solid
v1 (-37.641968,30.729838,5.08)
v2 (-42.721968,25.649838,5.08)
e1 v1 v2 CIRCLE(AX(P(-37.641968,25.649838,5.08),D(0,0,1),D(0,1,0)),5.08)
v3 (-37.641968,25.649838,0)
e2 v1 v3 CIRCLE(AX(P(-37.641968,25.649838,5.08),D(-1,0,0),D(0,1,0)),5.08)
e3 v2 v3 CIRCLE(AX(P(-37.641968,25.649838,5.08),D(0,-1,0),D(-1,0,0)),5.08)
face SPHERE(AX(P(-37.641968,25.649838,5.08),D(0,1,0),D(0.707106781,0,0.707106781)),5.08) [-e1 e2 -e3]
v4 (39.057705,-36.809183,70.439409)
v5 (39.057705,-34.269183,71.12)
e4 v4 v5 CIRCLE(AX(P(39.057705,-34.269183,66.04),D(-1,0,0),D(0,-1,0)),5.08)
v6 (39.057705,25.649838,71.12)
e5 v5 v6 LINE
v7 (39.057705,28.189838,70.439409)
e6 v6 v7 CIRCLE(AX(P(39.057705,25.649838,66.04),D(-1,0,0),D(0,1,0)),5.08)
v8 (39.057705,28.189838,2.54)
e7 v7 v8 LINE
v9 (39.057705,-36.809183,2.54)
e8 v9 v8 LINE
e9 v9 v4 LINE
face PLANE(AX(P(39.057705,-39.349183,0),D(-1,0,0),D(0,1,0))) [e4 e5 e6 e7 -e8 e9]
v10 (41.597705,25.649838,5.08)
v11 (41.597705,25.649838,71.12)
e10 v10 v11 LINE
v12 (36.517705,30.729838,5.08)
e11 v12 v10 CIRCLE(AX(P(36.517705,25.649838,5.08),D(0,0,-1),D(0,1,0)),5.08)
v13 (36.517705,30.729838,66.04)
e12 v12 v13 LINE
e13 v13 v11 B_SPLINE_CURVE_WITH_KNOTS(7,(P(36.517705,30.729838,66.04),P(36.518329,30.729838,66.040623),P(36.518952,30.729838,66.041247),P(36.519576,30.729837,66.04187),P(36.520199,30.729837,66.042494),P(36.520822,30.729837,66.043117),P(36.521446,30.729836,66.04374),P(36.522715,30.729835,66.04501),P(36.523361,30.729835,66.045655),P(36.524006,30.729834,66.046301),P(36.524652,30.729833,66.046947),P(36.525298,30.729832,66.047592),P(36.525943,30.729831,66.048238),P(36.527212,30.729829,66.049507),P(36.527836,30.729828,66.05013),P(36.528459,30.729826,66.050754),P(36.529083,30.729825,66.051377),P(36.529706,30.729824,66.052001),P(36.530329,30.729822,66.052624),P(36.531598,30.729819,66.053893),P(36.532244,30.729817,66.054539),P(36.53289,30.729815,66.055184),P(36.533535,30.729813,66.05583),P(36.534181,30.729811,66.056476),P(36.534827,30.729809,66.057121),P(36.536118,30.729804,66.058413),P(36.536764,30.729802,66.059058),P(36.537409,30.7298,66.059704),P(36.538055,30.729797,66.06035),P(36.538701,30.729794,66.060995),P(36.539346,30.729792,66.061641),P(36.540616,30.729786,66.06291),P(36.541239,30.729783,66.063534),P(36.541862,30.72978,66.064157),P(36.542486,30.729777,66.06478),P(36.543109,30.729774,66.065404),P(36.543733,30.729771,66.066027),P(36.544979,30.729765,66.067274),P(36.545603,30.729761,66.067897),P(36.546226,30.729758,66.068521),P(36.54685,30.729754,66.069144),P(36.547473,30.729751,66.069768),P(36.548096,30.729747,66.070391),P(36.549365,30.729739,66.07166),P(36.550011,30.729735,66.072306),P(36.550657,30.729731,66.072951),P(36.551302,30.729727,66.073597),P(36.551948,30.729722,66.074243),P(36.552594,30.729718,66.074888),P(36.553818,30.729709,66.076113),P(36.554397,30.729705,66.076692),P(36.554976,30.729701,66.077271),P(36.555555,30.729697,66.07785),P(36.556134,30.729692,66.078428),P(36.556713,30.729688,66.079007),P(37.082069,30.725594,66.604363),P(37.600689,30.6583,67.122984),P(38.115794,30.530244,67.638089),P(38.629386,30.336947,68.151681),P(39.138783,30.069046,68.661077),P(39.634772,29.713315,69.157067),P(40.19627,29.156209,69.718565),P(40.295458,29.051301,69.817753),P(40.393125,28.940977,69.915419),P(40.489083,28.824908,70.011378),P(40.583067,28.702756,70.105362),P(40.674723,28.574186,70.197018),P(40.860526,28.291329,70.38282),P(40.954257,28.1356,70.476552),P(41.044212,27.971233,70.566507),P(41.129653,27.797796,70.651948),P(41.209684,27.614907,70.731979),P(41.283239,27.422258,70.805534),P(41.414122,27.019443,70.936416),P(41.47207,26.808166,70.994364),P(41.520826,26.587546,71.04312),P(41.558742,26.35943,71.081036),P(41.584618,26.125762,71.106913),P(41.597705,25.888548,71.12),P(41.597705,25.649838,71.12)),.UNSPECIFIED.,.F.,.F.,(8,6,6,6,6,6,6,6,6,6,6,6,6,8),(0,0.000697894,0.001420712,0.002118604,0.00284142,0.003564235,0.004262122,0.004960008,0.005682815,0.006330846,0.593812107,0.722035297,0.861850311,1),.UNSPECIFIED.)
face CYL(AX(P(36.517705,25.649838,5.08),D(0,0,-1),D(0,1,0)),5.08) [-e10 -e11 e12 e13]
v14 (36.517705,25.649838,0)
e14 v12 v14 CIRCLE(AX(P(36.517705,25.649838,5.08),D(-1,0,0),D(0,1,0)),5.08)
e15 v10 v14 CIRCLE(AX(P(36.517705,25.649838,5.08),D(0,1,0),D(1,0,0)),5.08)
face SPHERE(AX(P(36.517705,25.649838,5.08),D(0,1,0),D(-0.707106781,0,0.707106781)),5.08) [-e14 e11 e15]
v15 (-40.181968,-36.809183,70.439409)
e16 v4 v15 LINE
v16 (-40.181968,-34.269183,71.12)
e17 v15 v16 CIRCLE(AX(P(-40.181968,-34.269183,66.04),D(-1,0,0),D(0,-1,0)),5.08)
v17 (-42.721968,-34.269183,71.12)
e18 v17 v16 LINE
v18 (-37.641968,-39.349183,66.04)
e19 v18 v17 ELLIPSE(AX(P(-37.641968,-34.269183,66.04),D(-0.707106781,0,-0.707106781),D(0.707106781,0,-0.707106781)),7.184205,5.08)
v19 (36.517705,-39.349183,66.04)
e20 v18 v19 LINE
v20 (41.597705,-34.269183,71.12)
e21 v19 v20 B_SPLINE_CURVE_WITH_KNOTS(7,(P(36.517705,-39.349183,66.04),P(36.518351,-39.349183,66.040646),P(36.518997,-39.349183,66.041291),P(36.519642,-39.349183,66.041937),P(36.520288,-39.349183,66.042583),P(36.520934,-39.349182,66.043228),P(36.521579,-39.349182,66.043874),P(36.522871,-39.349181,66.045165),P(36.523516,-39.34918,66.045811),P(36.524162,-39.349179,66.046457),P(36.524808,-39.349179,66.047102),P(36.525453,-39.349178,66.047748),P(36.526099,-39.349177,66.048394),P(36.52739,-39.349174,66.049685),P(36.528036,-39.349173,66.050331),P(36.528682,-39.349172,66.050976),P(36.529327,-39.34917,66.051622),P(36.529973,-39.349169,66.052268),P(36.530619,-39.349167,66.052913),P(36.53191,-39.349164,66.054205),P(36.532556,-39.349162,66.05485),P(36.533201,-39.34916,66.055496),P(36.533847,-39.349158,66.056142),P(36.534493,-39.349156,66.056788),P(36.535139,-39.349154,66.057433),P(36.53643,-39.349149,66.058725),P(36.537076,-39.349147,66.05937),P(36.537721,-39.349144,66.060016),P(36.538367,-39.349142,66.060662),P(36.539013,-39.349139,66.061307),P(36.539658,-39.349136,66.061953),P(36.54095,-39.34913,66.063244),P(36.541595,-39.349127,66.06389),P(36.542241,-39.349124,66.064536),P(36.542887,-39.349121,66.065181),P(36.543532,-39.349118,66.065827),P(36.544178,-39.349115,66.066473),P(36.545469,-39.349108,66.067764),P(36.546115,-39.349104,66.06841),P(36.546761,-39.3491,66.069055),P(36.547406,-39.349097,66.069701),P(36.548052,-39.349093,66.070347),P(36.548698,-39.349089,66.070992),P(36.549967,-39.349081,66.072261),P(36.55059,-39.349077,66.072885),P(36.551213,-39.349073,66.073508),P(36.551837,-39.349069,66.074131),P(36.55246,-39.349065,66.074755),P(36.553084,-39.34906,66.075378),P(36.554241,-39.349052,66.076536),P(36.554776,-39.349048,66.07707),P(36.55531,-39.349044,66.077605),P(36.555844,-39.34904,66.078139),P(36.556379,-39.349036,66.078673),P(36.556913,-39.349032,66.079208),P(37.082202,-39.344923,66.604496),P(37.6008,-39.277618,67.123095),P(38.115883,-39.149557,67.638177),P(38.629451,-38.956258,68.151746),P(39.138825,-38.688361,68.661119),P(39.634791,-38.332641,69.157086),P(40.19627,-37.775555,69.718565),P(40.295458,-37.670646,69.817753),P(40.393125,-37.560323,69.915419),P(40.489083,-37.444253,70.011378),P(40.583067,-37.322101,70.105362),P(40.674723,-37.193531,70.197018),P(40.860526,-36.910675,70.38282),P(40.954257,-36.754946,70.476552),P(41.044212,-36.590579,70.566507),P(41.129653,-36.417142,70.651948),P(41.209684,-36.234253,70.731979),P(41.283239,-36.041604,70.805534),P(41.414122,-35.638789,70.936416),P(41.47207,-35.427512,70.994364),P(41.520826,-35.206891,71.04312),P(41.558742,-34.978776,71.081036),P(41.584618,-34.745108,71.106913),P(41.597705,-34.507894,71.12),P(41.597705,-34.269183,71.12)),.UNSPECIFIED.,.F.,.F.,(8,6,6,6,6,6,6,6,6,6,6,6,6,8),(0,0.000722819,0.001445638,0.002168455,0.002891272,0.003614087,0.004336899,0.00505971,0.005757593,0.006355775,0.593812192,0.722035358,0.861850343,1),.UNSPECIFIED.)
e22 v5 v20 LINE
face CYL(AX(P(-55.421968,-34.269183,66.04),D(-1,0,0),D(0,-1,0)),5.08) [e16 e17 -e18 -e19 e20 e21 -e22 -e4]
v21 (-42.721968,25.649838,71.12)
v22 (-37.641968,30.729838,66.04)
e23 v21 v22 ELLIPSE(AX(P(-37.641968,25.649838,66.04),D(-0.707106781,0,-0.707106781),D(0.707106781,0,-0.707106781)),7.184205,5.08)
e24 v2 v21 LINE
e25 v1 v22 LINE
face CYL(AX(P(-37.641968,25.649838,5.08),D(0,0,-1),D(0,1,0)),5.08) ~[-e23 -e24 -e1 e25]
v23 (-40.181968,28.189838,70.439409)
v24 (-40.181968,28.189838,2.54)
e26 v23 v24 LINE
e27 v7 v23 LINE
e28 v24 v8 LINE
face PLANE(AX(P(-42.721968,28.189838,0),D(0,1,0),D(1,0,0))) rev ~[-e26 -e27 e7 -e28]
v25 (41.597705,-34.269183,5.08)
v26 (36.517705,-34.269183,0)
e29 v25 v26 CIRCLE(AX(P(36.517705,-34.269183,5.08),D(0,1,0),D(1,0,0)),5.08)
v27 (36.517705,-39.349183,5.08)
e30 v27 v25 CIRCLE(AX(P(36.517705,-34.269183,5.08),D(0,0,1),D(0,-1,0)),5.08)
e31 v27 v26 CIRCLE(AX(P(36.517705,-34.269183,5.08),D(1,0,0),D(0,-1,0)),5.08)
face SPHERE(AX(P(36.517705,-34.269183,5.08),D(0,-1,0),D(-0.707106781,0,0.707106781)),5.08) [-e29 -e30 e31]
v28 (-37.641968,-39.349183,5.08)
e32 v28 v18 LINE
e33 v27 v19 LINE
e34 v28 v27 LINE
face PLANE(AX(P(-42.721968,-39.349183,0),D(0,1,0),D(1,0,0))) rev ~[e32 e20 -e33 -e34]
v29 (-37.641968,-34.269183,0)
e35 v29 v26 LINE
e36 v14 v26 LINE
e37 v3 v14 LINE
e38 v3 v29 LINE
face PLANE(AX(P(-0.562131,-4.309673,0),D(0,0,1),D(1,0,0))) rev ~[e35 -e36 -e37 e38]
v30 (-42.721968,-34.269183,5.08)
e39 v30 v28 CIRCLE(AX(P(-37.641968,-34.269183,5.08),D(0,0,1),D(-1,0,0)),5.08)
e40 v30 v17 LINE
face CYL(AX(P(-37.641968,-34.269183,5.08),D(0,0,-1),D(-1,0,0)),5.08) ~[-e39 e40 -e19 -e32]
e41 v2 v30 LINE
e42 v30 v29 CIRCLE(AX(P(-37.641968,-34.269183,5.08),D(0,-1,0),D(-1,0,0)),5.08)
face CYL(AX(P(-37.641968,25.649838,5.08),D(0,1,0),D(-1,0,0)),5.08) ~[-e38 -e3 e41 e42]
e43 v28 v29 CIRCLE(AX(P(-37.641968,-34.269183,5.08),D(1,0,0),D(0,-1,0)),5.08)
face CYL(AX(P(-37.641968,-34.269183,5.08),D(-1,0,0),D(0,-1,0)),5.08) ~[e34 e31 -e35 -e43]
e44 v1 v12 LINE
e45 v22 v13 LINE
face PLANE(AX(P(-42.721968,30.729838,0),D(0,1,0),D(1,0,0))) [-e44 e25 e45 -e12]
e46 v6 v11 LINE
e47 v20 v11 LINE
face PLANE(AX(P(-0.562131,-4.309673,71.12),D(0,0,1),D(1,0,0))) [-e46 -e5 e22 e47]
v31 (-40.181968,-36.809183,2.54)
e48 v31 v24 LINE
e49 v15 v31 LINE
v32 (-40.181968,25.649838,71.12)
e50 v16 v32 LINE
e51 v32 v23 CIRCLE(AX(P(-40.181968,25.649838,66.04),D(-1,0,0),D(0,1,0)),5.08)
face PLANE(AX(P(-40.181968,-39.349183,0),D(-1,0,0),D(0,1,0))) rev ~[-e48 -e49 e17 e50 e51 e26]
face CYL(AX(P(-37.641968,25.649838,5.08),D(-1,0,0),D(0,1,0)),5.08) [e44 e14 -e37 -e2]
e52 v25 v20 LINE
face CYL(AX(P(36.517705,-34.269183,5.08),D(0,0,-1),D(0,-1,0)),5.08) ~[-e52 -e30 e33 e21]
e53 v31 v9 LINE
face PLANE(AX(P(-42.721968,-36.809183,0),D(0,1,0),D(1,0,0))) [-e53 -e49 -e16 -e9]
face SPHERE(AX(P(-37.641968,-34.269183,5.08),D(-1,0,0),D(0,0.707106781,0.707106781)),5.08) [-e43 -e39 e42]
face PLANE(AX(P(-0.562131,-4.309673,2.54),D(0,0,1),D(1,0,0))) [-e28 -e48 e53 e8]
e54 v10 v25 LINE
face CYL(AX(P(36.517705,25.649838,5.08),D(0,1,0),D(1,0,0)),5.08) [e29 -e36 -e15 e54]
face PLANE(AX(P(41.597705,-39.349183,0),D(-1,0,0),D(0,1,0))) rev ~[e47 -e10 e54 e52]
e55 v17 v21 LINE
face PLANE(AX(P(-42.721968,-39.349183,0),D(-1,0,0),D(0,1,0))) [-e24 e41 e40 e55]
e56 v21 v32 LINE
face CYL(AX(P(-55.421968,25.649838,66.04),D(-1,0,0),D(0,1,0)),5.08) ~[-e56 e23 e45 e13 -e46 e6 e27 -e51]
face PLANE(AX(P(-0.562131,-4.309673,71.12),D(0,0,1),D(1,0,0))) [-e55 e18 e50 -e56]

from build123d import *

# Parameters (mm, degrees)
F0_W         = 84.3196734786
F0_H         = 70.0790211558
F1_DEPTH     = 71.12
F2_T         = -2.54
F3_T1_DEPTH  = 78.74
F3_T3_DEPTH  = 109.7196734786
F3_T5_DEPTH  = 74.1596734786
F3_T7_DEPTH  = 59.9190211558
F3_S11_W     = 5.08
F3_S11_H     = 5.08
F3_T12_DEPTH = 5.08
F3_S17_W     = 5.08
F3_S17_H     = 5.08
F3_T18_DEPTH = 5.08
F3_S23_W     = 5.08
F3_S23_H     = 5.08
F3_T24_DEPTH = 5.08
F3_S29_W     = 5.08
F3_S29_H     = 5.08
F3_T30_DEPTH = 5.08


# Not quite as in the source:
# - a fillet or chamfer that OpenCascade refuses, or shapes differently, is made with other operations: its cross-section is extruded or revolved along the edge and cut away or added


with BuildPart() as f1:
    # F0 (on Top) → F1 (new body)
    with BuildSketch(Plane.XY):
        with Locations((-0.5621314049, -4.3096728623)):
            Rectangle(F0_W, F0_H)
    extrude(amount=F1_DEPTH)

    # F2
    f2_openings = [f1.faces().sort_by_distance(p)[0] for p in [
        (-0.562131, -4.309673, 71.12),
    ]]
    offset(amount=F2_T, openings=f2_openings)

    # F3: fillet of radius 5.08 on 10 edges, made by hand

    # F3_s2 → F3_t1 (cut)
    with BuildSketch(Plane.XY.offset(5.08)):
        with BuildLine():
            ThreePointArc((36.5177053344, -39.3491834402), (40.1098077829, -37.8612858886), (41.5977053344, -34.2691834402))
            Line((41.5977053344, -34.2691834402), (41.5977053344, -39.3491834402))
            Line((41.5977053344, -39.3491834402), (36.5177053344, -39.3491834402))
        make_face()
        with BuildLine():
            ThreePointArc((-42.7219681442, -34.2691834402), (-41.2340705926, -37.8612858886), (-37.6419681442, -39.3491834402))
            Line((-37.6419681442, -39.3491834402), (-42.7219681442, -39.3491834402))
            Line((-42.7219681442, -39.3491834402), (-42.7219681442, -34.2691834402))
        make_face()
        with BuildLine():
            ThreePointArc((36.5177053344, 30.7298377156), (40.1098077829, 29.2419401641), (41.5977053344, 25.6498377156))
            Line((41.5977053344, 25.6498377156), (41.5977053344, 30.7298377156))
            Line((41.5977053344, 30.7298377156), (36.5177053344, 30.7298377156))
        make_face()
        with BuildLine():
            ThreePointArc((-37.6419681442, 30.7298377156), (-41.2340705926, 29.2419401641), (-42.7219681442, 25.6498377156))
            Line((-42.7219681442, 25.6498377156), (-42.7219681442, 30.7298377156))
            Line((-42.7219681442, 30.7298377156), (-37.6419681442, 30.7298377156))
        make_face()
    extrude(amount=F3_T1_DEPTH, mode=Mode.SUBTRACT)

    # F3_s4 → F3_t3 (cut)
    with BuildSketch(Plane.YZ.offset(-55.4219681442)):
        with BuildLine():
            ThreePointArc((30.7298377156, 66.04), (29.2419401641, 69.6321024484), (25.6498377156, 71.12))
            Line((25.6498377156, 71.12), (30.7298377156, 71.12))
            Line((30.7298377156, 71.12), (30.7298377156, 66.04))
        make_face()
        with BuildLine():
            ThreePointArc((-39.3491834402, 66.04), (-37.8612858886, 69.6321024484), (-34.2691834402, 71.12))
            Line((-34.2691834402, 71.12), (-39.3491834402, 71.12))
            Line((-39.3491834402, 71.12), (-39.3491834402, 66.04))
        make_face()
    extrude(amount=F3_T3_DEPTH, mode=Mode.SUBTRACT)

    # F3_s6 → F3_t5 (cut)
    with BuildSketch(Plane.YZ.offset(-37.6419681442)):
        with BuildLine():
            ThreePointArc((30.7298377156, 5.08), (29.2419401641, 1.4878975516), (25.6498377156, 0))
            Line((25.6498377156, 0), (30.7298377156, 0))
            Line((30.7298377156, 0), (30.7298377156, 5.08))
        make_face()
        with BuildLine():
            ThreePointArc((-39.3491834402, 5.08), (-37.8612858886, 1.4878975516), (-34.2691834402, 0))
            Line((-34.2691834402, 0), (-39.3491834402, 0))
            Line((-39.3491834402, 0), (-39.3491834402, 5.08))
        make_face()
    extrude(amount=F3_T5_DEPTH, mode=Mode.SUBTRACT)

    # F3_s8 → F3_t7 (cut)
    with BuildSketch(Plane.XZ.offset(-25.6498377156)):
        with BuildLine():
            ThreePointArc((41.5977053344, 5.08), (40.1098077829, 1.4878975516), (36.5177053344, 0))
            Line((36.5177053344, 0), (41.5977053344, 0))
            Line((41.5977053344, 0), (41.5977053344, 5.08))
        make_face()
        with BuildLine():
            ThreePointArc((-42.7219681442, 5.08), (-41.2340705926, 1.4878975516), (-37.6419681442, 0))
            Line((-37.6419681442, 0), (-42.7219681442, 0))
            Line((-42.7219681442, 0), (-42.7219681442, 5.08))
        make_face()
    extrude(amount=F3_T7_DEPTH, mode=Mode.SUBTRACT)


with BuildPart() as f3_tool10:
    # F3_s11 → F3_t12 (new body)
    with BuildSketch(Plane.XZ.offset(34.2691834402)):
        with Locations((39.0577053344, 2.54)):
            Rectangle(F3_S11_W, F3_S11_H)
    extrude(amount=F3_T12_DEPTH)

    # F3_s13 → F3_t14 (revolve, cut)
    with BuildSketch(Plane(origin=(36.5177053344, -34.2691834402, 5.08), x_dir=(-0.7071067812, 0, 0.7071067812), z_dir=(0.7071067812, 0, 0.7071067812))):
        with BuildLine():
            ThreePointArc((0, -5.08), (5.08, 0), (0, 5.08))
            Line((0, 5.08), (0, -5.08))
        make_face()
    revolve(axis=Axis((36.5177053344, -34.2691834402, 5.08), (0, -1, 0)), mode=Mode.SUBTRACT)


with BuildPart() as f1_1:
    add(f1.part)

    # F3_t9: cut F3_tool10
    add(f3_tool10.part, mode=Mode.SUBTRACT)


with BuildPart() as f3_tool16:
    # F3_s17 → F3_t18 (new body)
    with BuildSketch(Plane.YZ.offset(-37.6419681442)):
        with Locations((-36.8091834402, 2.54)):
            Rectangle(F3_S17_W, F3_S17_H)
    extrude(amount=-F3_T18_DEPTH)

    # F3_s19 → F3_t20 (revolve, cut)
    with BuildSketch(Plane(origin=(-37.6419681442, -34.2691834402, 5.08), x_dir=(0, 0.7071067812, 0.7071067812), z_dir=(0, -0.7071067812, 0.7071067812))):
        with BuildLine():
            ThreePointArc((0, -5.08), (5.08, 0), (0, 5.08))
            Line((0, 5.08), (0, -5.08))
        make_face()
    revolve(axis=Axis((-37.6419681442, -34.2691834402, 5.08), (-1, 0, 0)), mode=Mode.SUBTRACT)


with BuildPart() as f1_2:
    add(f1_1.part)

    # F3_t15: cut F3_tool16
    add(f3_tool16.part, mode=Mode.SUBTRACT)


with BuildPart() as f3_tool22:
    # F3_s23 → F3_t24 (new body)
    with BuildSketch(Plane.XZ.offset(-25.6498377156)):
        with Locations((39.0577053344, 2.54)):
            Rectangle(F3_S23_W, F3_S23_H)
    extrude(amount=-F3_T24_DEPTH)

    # F3_s25 → F3_t26 (revolve, cut)
    with BuildSketch(Plane(origin=(36.5177053344, 25.6498377156, 5.08), x_dir=(-0.7071067812, 0, 0.7071067812), z_dir=(-0.7071067812, 0, -0.7071067812))):
        with BuildLine():
            ThreePointArc((0, -5.08), (5.08, 0), (0, 5.08))
            Line((0, 5.08), (0, -5.08))
        make_face()
    revolve(axis=Axis((36.5177053344, 25.6498377156, 5.08), (0, 1, 0)), mode=Mode.SUBTRACT)


with BuildPart() as f1_3:
    add(f1_2.part)

    # F3_t21: cut F3_tool22
    add(f3_tool22.part, mode=Mode.SUBTRACT)


with BuildPart() as f3_tool28:
    # F3_s29 → F3_t30 (new body)
    with BuildSketch(Plane.XZ.offset(-25.6498377156)):
        with Locations((-40.1819681442, 2.54)):
            Rectangle(F3_S29_W, F3_S29_H)
    extrude(amount=-F3_T30_DEPTH)

    # F3_s31 → F3_t32 (revolve, cut)
    with BuildSketch(Plane(origin=(-37.6419681442, 25.6498377156, 5.08), x_dir=(0.7071067812, 0, 0.7071067812), z_dir=(-0.7071067812, 0, 0.7071067812))):
        with BuildLine():
            ThreePointArc((0, -5.08), (5.08, 0), (0, 5.08))
            Line((0, 5.08), (0, -5.08))
        make_face()
    revolve(axis=Axis((-37.6419681442, 25.6498377156, 5.08), (0, 1, 0)), mode=Mode.SUBTRACT)


with BuildPart() as f1_4:
    add(f1_3.part)

    # F3_t27: cut F3_tool28
    add(f3_tool28.part, mode=Mode.SUBTRACT)


solid = f1_4.part
